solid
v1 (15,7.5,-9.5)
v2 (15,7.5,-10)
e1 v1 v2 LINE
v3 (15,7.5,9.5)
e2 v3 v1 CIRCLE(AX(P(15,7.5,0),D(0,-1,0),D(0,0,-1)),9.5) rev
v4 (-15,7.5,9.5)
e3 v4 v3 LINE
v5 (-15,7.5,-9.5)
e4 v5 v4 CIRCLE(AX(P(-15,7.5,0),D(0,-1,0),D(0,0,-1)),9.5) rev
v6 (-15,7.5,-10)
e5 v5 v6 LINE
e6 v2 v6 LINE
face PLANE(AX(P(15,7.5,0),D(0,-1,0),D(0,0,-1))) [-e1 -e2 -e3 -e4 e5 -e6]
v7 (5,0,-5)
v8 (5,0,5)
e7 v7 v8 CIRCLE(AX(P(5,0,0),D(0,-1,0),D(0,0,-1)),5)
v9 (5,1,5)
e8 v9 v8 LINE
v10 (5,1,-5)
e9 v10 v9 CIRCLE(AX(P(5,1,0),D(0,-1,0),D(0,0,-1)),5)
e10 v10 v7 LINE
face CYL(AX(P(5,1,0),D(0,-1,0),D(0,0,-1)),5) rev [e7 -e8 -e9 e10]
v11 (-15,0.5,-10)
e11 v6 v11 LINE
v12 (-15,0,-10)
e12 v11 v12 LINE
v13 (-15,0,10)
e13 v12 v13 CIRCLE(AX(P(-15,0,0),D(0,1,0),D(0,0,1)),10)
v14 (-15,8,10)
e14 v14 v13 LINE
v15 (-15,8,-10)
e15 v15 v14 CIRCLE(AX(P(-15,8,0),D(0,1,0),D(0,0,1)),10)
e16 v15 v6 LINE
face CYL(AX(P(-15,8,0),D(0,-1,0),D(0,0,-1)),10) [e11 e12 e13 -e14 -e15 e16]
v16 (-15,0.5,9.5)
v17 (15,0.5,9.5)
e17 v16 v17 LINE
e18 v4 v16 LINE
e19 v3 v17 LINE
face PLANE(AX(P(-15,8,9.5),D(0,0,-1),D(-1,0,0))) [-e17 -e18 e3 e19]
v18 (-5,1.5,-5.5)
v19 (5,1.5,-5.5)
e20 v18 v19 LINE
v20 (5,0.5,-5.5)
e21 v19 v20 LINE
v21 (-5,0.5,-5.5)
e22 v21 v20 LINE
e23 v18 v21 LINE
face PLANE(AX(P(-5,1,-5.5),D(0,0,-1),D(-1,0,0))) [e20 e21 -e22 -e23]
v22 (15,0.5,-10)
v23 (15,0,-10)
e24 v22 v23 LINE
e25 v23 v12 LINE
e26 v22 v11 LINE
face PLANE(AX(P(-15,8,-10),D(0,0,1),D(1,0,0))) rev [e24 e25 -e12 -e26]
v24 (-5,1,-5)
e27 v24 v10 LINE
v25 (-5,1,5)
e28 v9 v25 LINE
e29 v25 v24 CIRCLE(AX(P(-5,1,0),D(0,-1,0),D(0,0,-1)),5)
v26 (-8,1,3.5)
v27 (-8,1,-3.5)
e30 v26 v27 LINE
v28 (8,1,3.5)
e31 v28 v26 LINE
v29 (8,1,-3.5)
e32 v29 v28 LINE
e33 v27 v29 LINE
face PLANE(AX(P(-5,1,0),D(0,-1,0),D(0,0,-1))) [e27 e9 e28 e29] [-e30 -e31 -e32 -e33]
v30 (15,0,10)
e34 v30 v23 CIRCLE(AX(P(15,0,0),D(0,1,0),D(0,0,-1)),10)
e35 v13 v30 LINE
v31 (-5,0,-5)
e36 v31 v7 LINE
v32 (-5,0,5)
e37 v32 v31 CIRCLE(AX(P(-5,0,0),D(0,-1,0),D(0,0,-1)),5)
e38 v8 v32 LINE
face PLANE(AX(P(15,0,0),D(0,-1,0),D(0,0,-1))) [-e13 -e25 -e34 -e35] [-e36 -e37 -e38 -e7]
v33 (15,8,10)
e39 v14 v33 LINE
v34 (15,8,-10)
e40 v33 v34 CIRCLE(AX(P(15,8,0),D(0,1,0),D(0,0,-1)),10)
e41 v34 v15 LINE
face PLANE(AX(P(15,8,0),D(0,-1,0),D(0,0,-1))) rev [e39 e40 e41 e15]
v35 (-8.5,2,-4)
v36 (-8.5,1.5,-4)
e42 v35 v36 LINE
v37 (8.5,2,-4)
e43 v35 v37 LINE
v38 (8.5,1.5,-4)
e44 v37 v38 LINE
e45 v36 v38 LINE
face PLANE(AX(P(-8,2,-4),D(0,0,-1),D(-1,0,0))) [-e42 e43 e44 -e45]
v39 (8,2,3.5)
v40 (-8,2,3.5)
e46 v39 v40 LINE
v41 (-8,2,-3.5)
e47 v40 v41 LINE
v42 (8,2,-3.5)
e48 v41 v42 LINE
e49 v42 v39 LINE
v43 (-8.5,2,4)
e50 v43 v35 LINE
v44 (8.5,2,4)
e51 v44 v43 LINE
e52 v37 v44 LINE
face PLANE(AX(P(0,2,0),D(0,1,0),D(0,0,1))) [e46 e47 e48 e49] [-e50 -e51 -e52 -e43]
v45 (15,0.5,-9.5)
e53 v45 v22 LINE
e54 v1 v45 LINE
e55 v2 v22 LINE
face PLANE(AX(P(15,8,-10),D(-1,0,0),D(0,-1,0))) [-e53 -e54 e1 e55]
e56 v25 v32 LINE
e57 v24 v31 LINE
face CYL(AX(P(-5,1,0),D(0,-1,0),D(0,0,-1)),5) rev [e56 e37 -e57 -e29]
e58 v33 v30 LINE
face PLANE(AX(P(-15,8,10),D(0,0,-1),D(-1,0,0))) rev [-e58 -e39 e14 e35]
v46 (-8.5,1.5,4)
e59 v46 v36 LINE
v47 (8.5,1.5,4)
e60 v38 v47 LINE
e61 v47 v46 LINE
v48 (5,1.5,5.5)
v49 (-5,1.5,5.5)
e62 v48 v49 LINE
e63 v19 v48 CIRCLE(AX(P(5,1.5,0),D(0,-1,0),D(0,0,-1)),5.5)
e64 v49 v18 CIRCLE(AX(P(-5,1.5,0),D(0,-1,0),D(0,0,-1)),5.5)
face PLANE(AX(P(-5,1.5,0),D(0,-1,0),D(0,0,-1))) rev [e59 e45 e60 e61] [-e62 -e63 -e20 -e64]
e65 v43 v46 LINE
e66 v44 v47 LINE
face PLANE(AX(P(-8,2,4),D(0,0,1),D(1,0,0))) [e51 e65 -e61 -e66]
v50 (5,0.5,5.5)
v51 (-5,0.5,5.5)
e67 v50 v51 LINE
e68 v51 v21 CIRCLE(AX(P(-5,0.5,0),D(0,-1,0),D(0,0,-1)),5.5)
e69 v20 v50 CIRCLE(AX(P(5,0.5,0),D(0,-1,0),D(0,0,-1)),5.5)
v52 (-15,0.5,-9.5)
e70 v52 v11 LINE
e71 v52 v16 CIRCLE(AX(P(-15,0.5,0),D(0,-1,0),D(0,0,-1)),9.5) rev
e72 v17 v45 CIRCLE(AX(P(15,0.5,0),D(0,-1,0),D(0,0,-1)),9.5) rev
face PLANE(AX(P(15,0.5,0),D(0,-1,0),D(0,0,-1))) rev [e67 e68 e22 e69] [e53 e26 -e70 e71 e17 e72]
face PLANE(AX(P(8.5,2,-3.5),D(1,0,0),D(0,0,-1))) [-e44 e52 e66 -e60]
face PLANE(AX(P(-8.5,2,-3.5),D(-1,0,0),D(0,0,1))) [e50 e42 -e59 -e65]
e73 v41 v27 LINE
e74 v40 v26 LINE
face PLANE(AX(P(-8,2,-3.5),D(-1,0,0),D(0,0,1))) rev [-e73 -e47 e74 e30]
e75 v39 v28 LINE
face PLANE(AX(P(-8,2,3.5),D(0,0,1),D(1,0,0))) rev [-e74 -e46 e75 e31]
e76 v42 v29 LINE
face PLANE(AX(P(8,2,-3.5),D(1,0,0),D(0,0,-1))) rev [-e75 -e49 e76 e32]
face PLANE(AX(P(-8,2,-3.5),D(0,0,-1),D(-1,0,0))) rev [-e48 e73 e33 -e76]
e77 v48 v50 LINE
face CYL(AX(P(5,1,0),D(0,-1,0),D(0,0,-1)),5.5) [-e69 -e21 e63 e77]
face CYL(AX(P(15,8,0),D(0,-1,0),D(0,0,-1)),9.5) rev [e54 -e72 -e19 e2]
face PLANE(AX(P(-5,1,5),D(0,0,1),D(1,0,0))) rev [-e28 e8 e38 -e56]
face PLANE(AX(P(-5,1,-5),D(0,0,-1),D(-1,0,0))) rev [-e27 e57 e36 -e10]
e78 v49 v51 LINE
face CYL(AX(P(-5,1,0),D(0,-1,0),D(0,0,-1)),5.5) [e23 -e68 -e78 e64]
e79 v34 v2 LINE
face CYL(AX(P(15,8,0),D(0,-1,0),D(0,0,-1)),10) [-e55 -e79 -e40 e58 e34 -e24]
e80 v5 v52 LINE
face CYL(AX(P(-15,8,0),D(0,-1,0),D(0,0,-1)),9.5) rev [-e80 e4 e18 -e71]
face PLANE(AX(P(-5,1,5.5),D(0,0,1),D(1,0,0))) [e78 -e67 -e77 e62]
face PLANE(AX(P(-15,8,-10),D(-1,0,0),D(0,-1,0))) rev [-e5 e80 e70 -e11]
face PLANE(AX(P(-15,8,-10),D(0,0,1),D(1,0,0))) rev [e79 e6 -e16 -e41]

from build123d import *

# Parameters (mm, degrees)
BOSS_EXTRUDE1_DEPTH = 8
CUT_EXTRUDE1_DEPTH  = 1
SKETCH4_W           = 16
SKETCH4_H           = 7
CUT_EXTRUDE2_DEPTH  = 1
SHELL3_START        = 2
SHELL3_DEPTH        = 5.5
SHELL3_START_2      = 0.5
SHELL3_2_DEPTH      = 1.5
SHELL3_START_3      = 1.5
SHELL3_3_OUTLINE_W  = 17
SHELL3_3_OUTLINE_H  = 8
SHELL3_3_DEPTH      = 0.5


# Read off the part's stored shape, not the designer's step: Shell3
with BuildPart() as part:
    # Sketch2 → Boss-Extrude1 (new body)
    with BuildSketch(Plane(origin=(0, 0, 0), x_dir=(1, 0, 0), z_dir=(0, 1, 0))):
        with BuildLine():
            Line((-15, -10), (15, -10))
            ThreePointArc((15, -10), (25, 0), (15, 10))
            Line((15, 10), (-15, 10))
            ThreePointArc((-15, 10), (-25, 0), (-15, -10))
        make_face()
    extrude(amount=BOSS_EXTRUDE1_DEPTH)

    # Sketch3 → Cut-Extrude1 (cut)
    with BuildSketch(Plane.XZ):
        with BuildLine():
            Line((-5, 5), (5, 5))
            ThreePointArc((5, 5), (10, 0), (5, -5))
            Line((5, -5), (-5, -5))
            ThreePointArc((-5, -5), (-10, 0), (-5, 5))
        make_face()
    extrude(amount=-CUT_EXTRUDE1_DEPTH, mode=Mode.SUBTRACT)

    # Sketch4 → Cut-Extrude2 (cut)
    with BuildSketch(Plane.XZ.offset(-1)):
        Rectangle(SKETCH4_W, SKETCH4_H)
    extrude(amount=-CUT_EXTRUDE2_DEPTH, mode=Mode.SUBTRACT)

    # Shell3 outline → Shell3 (cut)
    with BuildSketch(Plane(origin=(0, 0, 0), x_dir=(1, 0, 0), z_dir=(0, 1, 0)).offset(SHELL3_START)):
        with BuildLine():
            Line((15, 9.5), (15, 10))
            Line((15, 10), (-15, 10))
            Line((-15, 10), (-15, 9.5))
            ThreePointArc((-15, 9.5), (-24.5, 0), (-15, -9.5))
            Line((-15, -9.5), (15, -9.5))
            ThreePointArc((15, -9.5), (24.5, 0), (15, 9.5))
        make_face()
    extrude(amount=SHELL3_DEPTH, mode=Mode.SUBTRACT)

    # Shell3 2 outline → Shell3 2 (cut)
    with BuildSketch(Plane(origin=(0, 0, 0), x_dir=(1, 0, 0), z_dir=(0, 1, 0)).offset(SHELL3_START_2)):
        with BuildLine():
            Line((15, 9.5), (15, 10))
            Line((15, 10), (-15, 10))
            Line((-15, 10), (-15, 9.5))
            ThreePointArc((-15, 9.5), (-24.5, 0), (-15, -9.5))
            Line((-15, -9.5), (15, -9.5))
            ThreePointArc((15, -9.5), (24.5, 0), (15, 9.5))
        make_face()
        with BuildLine():
            Line((5, -5.5), (-5, -5.5))
            ThreePointArc((-5, -5.5), (-10.5, 0), (-5, 5.5))
            Line((-5, 5.5), (5, 5.5))
            ThreePointArc((5, 5.5), (10.5, 0), (5, -5.5))
        make_face(mode=Mode.SUBTRACT)
    extrude(amount=SHELL3_2_DEPTH, mode=Mode.SUBTRACT)

    # Shell3 3 outline → Shell3 3 (cut)
    with BuildSketch(Plane(origin=(0, 0, 0), x_dir=(1, 0, 0), z_dir=(0, 1, 0)).offset(SHELL3_START_3)):
        with BuildLine():
            ThreePointArc((-5, 5.5), (-10.5, 0), (-5, -5.5))
            Line((-5, -5.5), (5, -5.5))
            ThreePointArc((5, -5.5), (10.5, 0), (5, 5.5))
            Line((5, 5.5), (-5, 5.5))
        make_face()
        Rectangle(SHELL3_3_OUTLINE_W, SHELL3_3_OUTLINE_H, mode=Mode.SUBTRACT)
    extrude(amount=SHELL3_3_DEPTH, mode=Mode.SUBTRACT)


solid = part.part
